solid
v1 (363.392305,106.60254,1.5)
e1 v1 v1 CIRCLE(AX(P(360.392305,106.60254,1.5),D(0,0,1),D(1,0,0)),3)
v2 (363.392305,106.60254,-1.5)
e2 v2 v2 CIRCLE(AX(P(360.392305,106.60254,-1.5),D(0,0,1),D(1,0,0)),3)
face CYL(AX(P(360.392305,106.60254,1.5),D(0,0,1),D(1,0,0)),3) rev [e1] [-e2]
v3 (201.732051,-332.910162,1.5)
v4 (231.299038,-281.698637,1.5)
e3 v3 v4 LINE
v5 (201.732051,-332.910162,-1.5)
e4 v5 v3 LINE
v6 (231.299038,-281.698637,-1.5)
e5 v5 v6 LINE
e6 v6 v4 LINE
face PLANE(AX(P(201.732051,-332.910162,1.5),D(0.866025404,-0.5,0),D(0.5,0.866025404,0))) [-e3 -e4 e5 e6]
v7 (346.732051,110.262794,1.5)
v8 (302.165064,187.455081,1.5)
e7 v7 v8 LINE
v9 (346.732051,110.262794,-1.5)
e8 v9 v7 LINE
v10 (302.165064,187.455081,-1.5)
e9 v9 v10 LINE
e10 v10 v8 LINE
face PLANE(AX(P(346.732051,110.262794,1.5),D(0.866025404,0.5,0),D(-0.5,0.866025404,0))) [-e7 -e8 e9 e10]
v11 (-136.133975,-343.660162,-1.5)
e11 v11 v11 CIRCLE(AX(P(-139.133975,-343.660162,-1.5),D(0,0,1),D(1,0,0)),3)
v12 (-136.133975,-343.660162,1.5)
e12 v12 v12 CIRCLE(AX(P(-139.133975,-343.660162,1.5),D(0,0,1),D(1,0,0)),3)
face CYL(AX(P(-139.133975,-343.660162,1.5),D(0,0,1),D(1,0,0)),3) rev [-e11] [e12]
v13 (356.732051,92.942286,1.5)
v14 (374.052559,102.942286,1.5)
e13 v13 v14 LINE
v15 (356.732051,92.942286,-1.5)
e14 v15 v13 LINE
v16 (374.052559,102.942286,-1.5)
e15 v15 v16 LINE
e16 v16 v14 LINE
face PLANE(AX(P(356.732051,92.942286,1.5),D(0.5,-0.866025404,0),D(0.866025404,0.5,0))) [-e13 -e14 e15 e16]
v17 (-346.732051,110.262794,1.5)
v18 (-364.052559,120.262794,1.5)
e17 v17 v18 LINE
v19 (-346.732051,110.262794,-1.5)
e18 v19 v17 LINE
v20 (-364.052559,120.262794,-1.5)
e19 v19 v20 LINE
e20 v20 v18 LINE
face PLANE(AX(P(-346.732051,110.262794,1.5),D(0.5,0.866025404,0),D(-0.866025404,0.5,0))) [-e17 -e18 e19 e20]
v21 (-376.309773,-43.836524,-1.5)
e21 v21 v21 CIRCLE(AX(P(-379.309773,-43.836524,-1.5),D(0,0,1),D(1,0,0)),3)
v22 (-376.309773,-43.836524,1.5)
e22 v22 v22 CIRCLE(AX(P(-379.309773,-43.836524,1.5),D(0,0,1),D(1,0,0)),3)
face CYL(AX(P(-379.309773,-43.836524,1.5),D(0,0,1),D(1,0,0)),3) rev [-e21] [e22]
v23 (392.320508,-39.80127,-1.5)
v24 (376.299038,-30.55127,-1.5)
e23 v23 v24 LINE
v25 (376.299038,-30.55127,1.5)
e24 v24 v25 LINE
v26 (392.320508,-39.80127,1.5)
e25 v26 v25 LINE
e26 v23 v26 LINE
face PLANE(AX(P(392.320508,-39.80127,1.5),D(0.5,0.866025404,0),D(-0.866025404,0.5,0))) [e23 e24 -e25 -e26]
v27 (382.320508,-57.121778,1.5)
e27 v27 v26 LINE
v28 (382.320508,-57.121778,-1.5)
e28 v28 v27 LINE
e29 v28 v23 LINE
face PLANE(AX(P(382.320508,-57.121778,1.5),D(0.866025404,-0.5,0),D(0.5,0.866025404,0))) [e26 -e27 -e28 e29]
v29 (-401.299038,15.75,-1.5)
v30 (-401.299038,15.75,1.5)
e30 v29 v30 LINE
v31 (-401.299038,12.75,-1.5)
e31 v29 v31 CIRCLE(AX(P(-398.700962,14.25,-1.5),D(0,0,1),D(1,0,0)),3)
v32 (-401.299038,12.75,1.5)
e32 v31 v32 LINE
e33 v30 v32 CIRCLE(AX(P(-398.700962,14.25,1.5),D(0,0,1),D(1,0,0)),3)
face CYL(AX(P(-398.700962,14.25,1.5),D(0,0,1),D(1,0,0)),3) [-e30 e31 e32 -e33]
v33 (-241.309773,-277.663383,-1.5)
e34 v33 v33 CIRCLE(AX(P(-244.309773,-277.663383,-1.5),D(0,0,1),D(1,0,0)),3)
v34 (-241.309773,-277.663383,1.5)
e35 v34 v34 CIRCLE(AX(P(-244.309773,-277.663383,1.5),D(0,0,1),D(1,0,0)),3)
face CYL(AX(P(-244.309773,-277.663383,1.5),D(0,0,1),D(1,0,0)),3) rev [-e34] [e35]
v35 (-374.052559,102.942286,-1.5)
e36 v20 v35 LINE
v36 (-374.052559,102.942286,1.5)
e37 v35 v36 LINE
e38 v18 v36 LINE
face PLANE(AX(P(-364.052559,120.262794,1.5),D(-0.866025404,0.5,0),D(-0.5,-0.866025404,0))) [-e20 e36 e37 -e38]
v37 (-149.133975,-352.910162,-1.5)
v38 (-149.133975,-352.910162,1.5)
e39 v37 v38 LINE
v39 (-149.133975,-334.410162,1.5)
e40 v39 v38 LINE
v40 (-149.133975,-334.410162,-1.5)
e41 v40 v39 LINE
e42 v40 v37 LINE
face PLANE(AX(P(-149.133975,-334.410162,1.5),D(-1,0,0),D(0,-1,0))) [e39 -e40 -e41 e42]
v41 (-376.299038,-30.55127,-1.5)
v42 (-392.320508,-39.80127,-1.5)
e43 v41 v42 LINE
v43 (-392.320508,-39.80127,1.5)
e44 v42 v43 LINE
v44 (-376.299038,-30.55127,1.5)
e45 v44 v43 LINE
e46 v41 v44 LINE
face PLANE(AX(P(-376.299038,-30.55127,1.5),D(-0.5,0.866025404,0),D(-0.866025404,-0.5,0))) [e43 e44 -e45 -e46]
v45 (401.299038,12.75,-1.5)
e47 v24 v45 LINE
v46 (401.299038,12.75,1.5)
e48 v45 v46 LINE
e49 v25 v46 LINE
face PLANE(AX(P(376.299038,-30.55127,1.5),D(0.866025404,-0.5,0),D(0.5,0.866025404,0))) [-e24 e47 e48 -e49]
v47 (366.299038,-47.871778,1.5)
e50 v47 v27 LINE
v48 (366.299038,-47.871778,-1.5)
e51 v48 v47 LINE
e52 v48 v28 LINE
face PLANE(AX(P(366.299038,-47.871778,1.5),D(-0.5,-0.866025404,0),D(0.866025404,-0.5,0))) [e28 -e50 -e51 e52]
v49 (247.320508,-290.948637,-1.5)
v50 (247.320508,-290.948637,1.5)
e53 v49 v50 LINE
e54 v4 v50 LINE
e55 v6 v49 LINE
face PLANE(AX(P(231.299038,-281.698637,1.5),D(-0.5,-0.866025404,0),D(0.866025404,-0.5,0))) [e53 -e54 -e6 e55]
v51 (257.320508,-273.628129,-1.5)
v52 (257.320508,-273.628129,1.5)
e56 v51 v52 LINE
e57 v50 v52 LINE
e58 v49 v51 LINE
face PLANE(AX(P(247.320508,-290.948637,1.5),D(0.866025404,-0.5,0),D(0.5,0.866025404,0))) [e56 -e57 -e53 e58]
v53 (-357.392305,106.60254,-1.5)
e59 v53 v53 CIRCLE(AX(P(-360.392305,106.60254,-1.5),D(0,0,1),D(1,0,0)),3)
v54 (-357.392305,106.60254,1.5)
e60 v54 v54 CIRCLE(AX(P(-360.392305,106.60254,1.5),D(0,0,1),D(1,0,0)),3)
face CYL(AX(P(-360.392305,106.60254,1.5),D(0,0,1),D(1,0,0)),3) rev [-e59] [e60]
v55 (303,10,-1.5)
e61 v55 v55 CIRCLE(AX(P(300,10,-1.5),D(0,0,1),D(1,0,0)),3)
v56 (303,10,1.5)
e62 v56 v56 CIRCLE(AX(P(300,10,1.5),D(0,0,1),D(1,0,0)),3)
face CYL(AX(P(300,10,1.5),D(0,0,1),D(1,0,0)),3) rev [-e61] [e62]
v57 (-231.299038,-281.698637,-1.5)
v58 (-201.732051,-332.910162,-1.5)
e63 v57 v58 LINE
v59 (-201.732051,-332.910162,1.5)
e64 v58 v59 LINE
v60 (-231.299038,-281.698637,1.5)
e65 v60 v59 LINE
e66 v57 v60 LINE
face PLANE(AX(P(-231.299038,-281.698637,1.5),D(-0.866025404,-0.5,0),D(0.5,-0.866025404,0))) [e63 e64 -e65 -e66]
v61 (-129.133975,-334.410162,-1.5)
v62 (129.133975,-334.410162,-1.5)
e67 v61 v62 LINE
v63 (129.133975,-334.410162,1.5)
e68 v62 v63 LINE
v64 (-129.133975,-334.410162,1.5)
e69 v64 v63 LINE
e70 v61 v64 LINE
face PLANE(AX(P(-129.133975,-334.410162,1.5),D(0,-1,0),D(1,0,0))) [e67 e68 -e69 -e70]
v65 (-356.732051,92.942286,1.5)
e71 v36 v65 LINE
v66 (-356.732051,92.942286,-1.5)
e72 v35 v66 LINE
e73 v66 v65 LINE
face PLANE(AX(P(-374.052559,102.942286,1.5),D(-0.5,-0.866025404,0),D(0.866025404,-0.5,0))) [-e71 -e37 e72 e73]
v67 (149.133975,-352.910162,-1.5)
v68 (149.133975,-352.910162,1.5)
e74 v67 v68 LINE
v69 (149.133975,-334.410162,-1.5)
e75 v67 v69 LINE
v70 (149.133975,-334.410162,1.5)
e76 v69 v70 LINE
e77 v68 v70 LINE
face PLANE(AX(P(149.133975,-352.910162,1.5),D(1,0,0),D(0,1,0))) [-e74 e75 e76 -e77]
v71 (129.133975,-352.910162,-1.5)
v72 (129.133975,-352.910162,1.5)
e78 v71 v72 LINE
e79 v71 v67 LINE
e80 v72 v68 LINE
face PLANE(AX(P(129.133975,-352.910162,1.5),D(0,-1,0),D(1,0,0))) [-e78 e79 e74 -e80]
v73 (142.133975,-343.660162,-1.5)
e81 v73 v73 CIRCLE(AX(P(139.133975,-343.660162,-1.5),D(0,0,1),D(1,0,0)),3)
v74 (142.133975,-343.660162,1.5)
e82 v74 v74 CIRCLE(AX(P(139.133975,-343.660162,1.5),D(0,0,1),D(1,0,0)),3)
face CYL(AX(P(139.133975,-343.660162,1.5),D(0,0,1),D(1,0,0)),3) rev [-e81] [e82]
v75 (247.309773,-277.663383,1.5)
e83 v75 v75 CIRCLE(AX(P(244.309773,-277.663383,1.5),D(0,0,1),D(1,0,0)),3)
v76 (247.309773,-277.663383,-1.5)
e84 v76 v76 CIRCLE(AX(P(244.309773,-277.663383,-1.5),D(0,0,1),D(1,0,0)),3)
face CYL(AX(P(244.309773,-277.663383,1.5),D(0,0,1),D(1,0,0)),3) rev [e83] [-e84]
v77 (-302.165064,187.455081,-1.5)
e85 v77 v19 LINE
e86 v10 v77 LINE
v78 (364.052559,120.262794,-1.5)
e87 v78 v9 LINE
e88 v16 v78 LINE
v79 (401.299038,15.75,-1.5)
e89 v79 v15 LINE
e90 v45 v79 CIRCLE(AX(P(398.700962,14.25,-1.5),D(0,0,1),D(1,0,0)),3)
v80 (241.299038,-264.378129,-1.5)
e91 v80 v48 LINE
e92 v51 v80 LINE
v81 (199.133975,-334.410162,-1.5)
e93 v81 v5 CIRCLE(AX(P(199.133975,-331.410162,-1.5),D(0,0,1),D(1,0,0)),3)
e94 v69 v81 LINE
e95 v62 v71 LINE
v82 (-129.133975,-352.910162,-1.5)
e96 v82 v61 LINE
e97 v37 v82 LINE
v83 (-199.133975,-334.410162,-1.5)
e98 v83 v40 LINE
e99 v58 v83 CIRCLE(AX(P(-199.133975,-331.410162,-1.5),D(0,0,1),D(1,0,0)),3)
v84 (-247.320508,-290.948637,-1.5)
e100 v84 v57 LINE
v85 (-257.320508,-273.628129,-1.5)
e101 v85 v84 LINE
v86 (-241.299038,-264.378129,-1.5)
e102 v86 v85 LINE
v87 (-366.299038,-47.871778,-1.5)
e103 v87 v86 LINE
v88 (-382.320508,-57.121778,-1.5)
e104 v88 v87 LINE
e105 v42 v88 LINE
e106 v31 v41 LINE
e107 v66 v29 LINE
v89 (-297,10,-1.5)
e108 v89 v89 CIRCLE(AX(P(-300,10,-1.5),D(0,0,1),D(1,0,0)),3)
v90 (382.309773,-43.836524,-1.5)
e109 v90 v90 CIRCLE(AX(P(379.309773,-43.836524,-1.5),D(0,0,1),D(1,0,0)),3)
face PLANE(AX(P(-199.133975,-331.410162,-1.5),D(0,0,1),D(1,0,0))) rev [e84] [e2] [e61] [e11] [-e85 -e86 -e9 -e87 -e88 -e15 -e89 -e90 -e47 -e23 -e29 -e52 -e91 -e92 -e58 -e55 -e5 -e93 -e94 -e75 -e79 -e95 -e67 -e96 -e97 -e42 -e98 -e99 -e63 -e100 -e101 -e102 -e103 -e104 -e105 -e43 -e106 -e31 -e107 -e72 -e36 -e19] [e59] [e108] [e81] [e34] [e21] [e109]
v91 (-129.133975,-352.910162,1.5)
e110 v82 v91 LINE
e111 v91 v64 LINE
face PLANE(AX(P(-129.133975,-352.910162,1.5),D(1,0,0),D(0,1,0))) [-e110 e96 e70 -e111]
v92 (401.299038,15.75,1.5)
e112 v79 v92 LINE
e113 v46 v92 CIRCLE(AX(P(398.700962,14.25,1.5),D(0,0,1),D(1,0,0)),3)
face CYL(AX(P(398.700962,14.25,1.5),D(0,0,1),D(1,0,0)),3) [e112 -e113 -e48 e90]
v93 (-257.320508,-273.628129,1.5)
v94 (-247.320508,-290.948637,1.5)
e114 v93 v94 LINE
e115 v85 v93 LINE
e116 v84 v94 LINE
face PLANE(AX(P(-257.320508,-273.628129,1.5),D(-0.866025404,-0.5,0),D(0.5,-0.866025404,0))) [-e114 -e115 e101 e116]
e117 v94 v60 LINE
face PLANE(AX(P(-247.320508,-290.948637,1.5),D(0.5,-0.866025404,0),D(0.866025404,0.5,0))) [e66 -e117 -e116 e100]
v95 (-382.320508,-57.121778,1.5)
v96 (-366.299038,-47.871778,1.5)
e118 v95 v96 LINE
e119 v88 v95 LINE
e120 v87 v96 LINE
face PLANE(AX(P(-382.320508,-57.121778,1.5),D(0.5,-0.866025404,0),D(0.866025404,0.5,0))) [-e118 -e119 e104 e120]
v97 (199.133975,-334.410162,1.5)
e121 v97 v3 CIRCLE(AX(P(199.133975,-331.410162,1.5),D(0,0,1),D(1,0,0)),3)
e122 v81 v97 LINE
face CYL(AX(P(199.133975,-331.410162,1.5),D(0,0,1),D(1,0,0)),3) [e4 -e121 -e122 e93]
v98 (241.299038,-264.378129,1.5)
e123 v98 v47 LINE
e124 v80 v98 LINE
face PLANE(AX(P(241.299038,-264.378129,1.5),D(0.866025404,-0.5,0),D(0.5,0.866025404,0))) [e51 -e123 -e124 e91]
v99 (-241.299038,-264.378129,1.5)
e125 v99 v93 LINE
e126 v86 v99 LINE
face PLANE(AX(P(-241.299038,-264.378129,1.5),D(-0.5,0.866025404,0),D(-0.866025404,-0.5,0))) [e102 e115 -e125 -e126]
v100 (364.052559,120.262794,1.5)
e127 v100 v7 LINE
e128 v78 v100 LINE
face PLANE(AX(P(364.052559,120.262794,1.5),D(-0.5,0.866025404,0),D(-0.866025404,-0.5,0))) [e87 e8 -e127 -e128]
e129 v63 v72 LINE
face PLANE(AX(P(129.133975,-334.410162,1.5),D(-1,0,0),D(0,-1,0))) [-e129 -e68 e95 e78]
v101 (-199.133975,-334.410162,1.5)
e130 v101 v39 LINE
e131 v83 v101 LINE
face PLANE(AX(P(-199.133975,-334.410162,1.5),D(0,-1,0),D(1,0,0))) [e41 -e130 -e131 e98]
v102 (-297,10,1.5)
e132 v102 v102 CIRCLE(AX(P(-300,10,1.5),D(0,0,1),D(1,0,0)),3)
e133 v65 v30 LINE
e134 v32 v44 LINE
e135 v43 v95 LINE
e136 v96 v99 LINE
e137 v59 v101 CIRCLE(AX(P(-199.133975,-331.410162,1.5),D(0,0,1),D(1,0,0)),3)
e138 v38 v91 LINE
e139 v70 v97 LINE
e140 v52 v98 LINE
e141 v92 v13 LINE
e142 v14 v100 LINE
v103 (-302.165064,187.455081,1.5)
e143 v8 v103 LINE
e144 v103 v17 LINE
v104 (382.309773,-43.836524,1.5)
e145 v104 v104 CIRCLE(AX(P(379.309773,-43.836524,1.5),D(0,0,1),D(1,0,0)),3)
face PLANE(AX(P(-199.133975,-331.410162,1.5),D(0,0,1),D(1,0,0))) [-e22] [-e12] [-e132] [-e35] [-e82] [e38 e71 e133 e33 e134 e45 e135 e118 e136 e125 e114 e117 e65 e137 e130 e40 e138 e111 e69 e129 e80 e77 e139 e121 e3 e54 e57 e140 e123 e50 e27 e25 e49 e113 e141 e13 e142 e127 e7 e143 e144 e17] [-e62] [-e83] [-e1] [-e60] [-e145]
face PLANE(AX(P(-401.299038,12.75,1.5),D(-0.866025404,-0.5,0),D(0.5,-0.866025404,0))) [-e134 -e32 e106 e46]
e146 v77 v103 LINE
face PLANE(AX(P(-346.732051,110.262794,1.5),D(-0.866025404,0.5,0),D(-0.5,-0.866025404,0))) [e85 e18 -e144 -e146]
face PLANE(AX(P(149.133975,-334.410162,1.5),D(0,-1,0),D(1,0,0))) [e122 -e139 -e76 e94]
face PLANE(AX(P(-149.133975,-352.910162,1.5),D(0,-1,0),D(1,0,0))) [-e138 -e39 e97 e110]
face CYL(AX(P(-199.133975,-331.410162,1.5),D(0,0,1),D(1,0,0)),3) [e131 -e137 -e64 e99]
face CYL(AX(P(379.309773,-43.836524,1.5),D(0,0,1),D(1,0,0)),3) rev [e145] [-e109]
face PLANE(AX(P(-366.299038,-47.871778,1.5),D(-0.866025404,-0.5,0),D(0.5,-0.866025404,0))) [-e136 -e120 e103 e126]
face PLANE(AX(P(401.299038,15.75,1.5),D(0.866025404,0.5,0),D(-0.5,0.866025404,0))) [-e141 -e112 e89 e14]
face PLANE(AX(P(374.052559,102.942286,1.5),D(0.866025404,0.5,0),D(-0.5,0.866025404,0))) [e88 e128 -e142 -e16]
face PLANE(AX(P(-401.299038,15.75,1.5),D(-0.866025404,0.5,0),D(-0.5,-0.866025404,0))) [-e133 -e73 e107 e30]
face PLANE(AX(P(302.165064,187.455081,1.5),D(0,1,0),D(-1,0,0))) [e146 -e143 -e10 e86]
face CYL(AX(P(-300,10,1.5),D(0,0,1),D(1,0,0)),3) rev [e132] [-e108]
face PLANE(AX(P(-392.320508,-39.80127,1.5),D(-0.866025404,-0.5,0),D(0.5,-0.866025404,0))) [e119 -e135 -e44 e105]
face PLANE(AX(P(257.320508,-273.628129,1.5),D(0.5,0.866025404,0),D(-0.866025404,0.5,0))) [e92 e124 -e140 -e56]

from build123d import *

# Parameters (mm, degrees)
SKETCH_1_R              = 3
EXTRUDE_1_DEPTH         = 1.5
SHEET_START             = -1.5
SHEET_METAL_1_OUTLINE_R = 3
SHEET_METAL_1_DEPTH     = 1.5


# Read off the part's stored shape, not the designer's step: Преобразовать-Твердое тело1
with BuildPart() as part:
    # Sketch 1 → Бобышка-Вытянуть1 (new body)
    with BuildSketch(Plane.XY):
        with BuildLine():
            Line((201.732050808, -332.910161514), (231.299038106, -281.698637287))
            Line((231.299038106, -281.698637287), (247.320508076, -290.948637287))
            Line((247.320508076, -290.948637287), (257.320508076, -273.628129211))
            Line((257.320508076, -273.628129211), (241.299038106, -264.378129211))
            Line((241.299038106, -264.378129211), (366.299038106, -47.871778265))
            Line((366.299038106, -47.871778265), (382.320508076, -57.121778265))
            Line((382.320508076, -57.121778265), (392.320508076, -39.801270189))
            Line((392.320508076, -39.801270189), (376.299038106, -30.551270189))
            Line((376.299038106, -30.551270189), (401.299038106, 12.75))
            ThreePointArc((401.299038106, 12.75), (401.700961894, 14.25), (401.299038106, 15.75))
            Line((401.299038106, 15.75), (356.732050808, 92.942286341))
            Line((356.732050808, 92.942286341), (374.052558883, 102.942286341))
            Line((374.052558883, 102.942286341), (364.052558883, 120.262794416))
            Line((364.052558883, 120.262794416), (346.732050808, 110.262794416))
            Line((346.732050808, 110.262794416), (302.165063509, 187.455080757))
            Line((302.165063509, 187.455080757), (-302.165063509, 187.455080757))
            Line((-302.165063509, 187.455080757), (-346.732050808, 110.262794416))
            Line((-346.732050808, 110.262794416), (-364.052558883, 120.262794416))
            Line((-364.052558883, 120.262794416), (-374.052558883, 102.942286341))
            Line((-374.052558883, 102.942286341), (-356.732050808, 92.942286341))
            Line((-356.732050808, 92.942286341), (-401.299038106, 15.75))
            ThreePointArc((-401.299038106, 15.75), (-401.700961894, 14.25), (-401.299038106, 12.75))
            Line((-401.299038106, 12.75), (-376.299038106, -30.551270189))
            Line((-376.299038106, -30.551270189), (-392.320508076, -39.801270189))
            Line((-392.320508076, -39.801270189), (-382.320508076, -57.121778265))
            Line((-382.320508076, -57.121778265), (-366.299038106, -47.871778265))
            Line((-366.299038106, -47.871778265), (-241.299038106, -264.378129211))
            Line((-241.299038106, -264.378129211), (-257.320508076, -273.628129211))
            Line((-257.320508076, -273.628129211), (-247.320508076, -290.948637287))
            Line((-247.320508076, -290.948637287), (-231.299038106, -281.698637287))
            Line((-231.299038106, -281.698637287), (-201.732050808, -332.910161514))
            ThreePointArc((-201.732050808, -332.910161514), (-200.633974596, -334.008237725), (-199.133974596, -334.410161514))
            Line((-199.133974596, -334.410161514), (-149.133974596, -334.410161514))
            Line((-149.133974596, -334.410161514), (-149.133974596, -352.910161514))
            Line((-149.133974596, -352.910161514), (-129.133974596, -352.910161514))
            Line((-129.133974596, -352.910161514), (-129.133974596, -334.410161514))
            Line((-129.133974596, -334.410161514), (129.133974596, -334.410161514))
            Line((129.133974596, -334.410161514), (129.133974596, -352.910161514))
            Line((129.133974596, -352.910161514), (149.133974596, -352.910161514))
            Line((149.133974596, -352.910161514), (149.133974596, -334.410161514))
            Line((149.133974596, -334.410161514), (199.133974596, -334.410161514))
            ThreePointArc((199.133974596, -334.410161514), (200.633974596, -334.008237725), (201.732050808, -332.910161514))
        make_face()
        with Locations((244.309773091, -277.663383249)):
            Circle(SKETCH_1_R, mode=Mode.SUBTRACT)
        with Locations((379.309773091, -43.836524227)):
            Circle(SKETCH_1_R, mode=Mode.SUBTRACT)
        with Locations((139.133974596, -343.660161514)):
            Circle(SKETCH_1_R, mode=Mode.SUBTRACT)
        with Locations((-139.133974596, -343.660161514)):
            Circle(SKETCH_1_R, mode=Mode.SUBTRACT)
        with Locations((-244.309773091, -277.663383249)):
            Circle(SKETCH_1_R, mode=Mode.SUBTRACT)
        with Locations((-379.309773091, -43.836524227)):
            Circle(SKETCH_1_R, mode=Mode.SUBTRACT)
        with Locations((300, 10)):
            Circle(SKETCH_1_R, mode=Mode.SUBTRACT)
        with Locations((-300, 10)):
            Circle(SKETCH_1_R, mode=Mode.SUBTRACT)
        with Locations((-360.392304845, 106.602540379)):
            Circle(SKETCH_1_R, mode=Mode.SUBTRACT)
        with Locations((360.392304845, 106.602540379)):
            Circle(SKETCH_1_R, mode=Mode.SUBTRACT)
    extrude(amount=EXTRUDE_1_DEPTH)

    # Sheet Metal 1 outline → Sheet Metal 1 (add)
    with BuildSketch(Plane.XY.offset(SHEET_START)):
        with BuildLine():
            Line((-199.133974596, -334.410161514), (-149.133974596, -334.410161514))
            Line((-149.133974596, -334.410161514), (-149.133974596, -352.910161514))
            Line((-149.133974596, -352.910161514), (-129.133974596, -352.910161514))
            Line((-129.133974596, -352.910161514), (-129.133974596, -334.410161514))
            Line((-129.133974596, -334.410161514), (129.133974596, -334.410161514))
            Line((129.133974596, -334.410161514), (129.133974596, -352.910161514))
            Line((129.133974596, -352.910161514), (149.133974596, -352.910161514))
            Line((149.133974596, -352.910161514), (149.133974596, -334.410161514))
            Line((149.133974596, -334.410161514), (199.133974596, -334.410161514))
            ThreePointArc((199.133974596, -334.410161514), (200.633974596, -334.008237725), (201.732050808, -332.910161514))
            Line((201.732050808, -332.910161514), (231.299038106, -281.698637287))
            Line((231.299038106, -281.698637287), (247.320508076, -290.948637287))
            Line((247.320508076, -290.948637287), (257.320508076, -273.628129211))
            Line((257.320508076, -273.628129211), (241.299038106, -264.378129211))
            Line((241.299038106, -264.378129211), (366.299038106, -47.871778265))
            Line((366.299038106, -47.871778265), (382.320508076, -57.121778265))
            Line((382.320508076, -57.121778265), (392.320508076, -39.801270189))
            Line((392.320508076, -39.801270189), (376.299038106, -30.551270189))
            Line((376.299038106, -30.551270189), (401.299038106, 12.75))
            ThreePointArc((401.299038106, 12.75), (401.700961894, 14.25), (401.299038106, 15.75))
            Line((401.299038106, 15.75), (356.732050808, 92.942286341))
            Line((356.732050808, 92.942286341), (374.052558883, 102.942286341))
            Line((374.052558883, 102.942286341), (364.052558883, 120.262794416))
            Line((364.052558883, 120.262794416), (346.732050808, 110.262794416))
            Line((346.732050808, 110.262794416), (302.165063509, 187.455080757))
            Line((302.165063509, 187.455080757), (-302.165063509, 187.455080757))
            Line((-302.165063509, 187.455080757), (-346.732050808, 110.262794416))
            Line((-346.732050808, 110.262794416), (-364.052558883, 120.262794416))
            Line((-364.052558883, 120.262794416), (-374.052558883, 102.942286341))
            Line((-374.052558883, 102.942286341), (-356.732050808, 92.942286341))
            Line((-356.732050808, 92.942286341), (-401.299038106, 15.75))
            ThreePointArc((-401.299038106, 15.75), (-401.700961894, 14.25), (-401.299038106, 12.75))
            Line((-401.299038106, 12.75), (-376.299038106, -30.551270189))
            Line((-376.299038106, -30.551270189), (-392.320508076, -39.801270189))
            Line((-392.320508076, -39.801270189), (-382.320508076, -57.121778265))
            Line((-382.320508076, -57.121778265), (-366.299038106, -47.871778265))
            Line((-366.299038106, -47.871778265), (-241.299038106, -264.378129211))
            Line((-241.299038106, -264.378129211), (-257.320508076, -273.628129211))
            Line((-257.320508076, -273.628129211), (-247.320508076, -290.948637287))
            Line((-247.320508076, -290.948637287), (-231.299038106, -281.698637287))
            Line((-231.299038106, -281.698637287), (-201.732050808, -332.910161514))
            ThreePointArc((-201.732050808, -332.910161514), (-200.633974596, -334.008237725), (-199.133974596, -334.410161514))
        make_face()
        with Locations((-244.309773091, -277.663383249)):
            Circle(SHEET_METAL_1_OUTLINE_R, mode=Mode.SUBTRACT)
        with Locations((-139.133974596, -343.660161514)):
            Circle(SHEET_METAL_1_OUTLINE_R, mode=Mode.SUBTRACT)
        with Locations((139.133974596, -343.660161514)):
            Circle(SHEET_METAL_1_OUTLINE_R, mode=Mode.SUBTRACT)
        with Locations((244.309773091, -277.663383249)):
            Circle(SHEET_METAL_1_OUTLINE_R, mode=Mode.SUBTRACT)
        with Locations((-379.309773091, -43.836524227)):
            Circle(SHEET_METAL_1_OUTLINE_R, mode=Mode.SUBTRACT)
        with Locations((-300, 10)):
            Circle(SHEET_METAL_1_OUTLINE_R, mode=Mode.SUBTRACT)
        with Locations((-360.392304845, 106.602540379)):
            Circle(SHEET_METAL_1_OUTLINE_R, mode=Mode.SUBTRACT)
        with Locations((379.309773091, -43.836524227)):
            Circle(SHEET_METAL_1_OUTLINE_R, mode=Mode.SUBTRACT)
        with Locations((300, 10)):
            Circle(SHEET_METAL_1_OUTLINE_R, mode=Mode.SUBTRACT)
        with Locations((360.392304845, 106.602540379)):
            Circle(SHEET_METAL_1_OUTLINE_R, mode=Mode.SUBTRACT)
    extrude(amount=SHEET_METAL_1_DEPTH)


solid = part.part
